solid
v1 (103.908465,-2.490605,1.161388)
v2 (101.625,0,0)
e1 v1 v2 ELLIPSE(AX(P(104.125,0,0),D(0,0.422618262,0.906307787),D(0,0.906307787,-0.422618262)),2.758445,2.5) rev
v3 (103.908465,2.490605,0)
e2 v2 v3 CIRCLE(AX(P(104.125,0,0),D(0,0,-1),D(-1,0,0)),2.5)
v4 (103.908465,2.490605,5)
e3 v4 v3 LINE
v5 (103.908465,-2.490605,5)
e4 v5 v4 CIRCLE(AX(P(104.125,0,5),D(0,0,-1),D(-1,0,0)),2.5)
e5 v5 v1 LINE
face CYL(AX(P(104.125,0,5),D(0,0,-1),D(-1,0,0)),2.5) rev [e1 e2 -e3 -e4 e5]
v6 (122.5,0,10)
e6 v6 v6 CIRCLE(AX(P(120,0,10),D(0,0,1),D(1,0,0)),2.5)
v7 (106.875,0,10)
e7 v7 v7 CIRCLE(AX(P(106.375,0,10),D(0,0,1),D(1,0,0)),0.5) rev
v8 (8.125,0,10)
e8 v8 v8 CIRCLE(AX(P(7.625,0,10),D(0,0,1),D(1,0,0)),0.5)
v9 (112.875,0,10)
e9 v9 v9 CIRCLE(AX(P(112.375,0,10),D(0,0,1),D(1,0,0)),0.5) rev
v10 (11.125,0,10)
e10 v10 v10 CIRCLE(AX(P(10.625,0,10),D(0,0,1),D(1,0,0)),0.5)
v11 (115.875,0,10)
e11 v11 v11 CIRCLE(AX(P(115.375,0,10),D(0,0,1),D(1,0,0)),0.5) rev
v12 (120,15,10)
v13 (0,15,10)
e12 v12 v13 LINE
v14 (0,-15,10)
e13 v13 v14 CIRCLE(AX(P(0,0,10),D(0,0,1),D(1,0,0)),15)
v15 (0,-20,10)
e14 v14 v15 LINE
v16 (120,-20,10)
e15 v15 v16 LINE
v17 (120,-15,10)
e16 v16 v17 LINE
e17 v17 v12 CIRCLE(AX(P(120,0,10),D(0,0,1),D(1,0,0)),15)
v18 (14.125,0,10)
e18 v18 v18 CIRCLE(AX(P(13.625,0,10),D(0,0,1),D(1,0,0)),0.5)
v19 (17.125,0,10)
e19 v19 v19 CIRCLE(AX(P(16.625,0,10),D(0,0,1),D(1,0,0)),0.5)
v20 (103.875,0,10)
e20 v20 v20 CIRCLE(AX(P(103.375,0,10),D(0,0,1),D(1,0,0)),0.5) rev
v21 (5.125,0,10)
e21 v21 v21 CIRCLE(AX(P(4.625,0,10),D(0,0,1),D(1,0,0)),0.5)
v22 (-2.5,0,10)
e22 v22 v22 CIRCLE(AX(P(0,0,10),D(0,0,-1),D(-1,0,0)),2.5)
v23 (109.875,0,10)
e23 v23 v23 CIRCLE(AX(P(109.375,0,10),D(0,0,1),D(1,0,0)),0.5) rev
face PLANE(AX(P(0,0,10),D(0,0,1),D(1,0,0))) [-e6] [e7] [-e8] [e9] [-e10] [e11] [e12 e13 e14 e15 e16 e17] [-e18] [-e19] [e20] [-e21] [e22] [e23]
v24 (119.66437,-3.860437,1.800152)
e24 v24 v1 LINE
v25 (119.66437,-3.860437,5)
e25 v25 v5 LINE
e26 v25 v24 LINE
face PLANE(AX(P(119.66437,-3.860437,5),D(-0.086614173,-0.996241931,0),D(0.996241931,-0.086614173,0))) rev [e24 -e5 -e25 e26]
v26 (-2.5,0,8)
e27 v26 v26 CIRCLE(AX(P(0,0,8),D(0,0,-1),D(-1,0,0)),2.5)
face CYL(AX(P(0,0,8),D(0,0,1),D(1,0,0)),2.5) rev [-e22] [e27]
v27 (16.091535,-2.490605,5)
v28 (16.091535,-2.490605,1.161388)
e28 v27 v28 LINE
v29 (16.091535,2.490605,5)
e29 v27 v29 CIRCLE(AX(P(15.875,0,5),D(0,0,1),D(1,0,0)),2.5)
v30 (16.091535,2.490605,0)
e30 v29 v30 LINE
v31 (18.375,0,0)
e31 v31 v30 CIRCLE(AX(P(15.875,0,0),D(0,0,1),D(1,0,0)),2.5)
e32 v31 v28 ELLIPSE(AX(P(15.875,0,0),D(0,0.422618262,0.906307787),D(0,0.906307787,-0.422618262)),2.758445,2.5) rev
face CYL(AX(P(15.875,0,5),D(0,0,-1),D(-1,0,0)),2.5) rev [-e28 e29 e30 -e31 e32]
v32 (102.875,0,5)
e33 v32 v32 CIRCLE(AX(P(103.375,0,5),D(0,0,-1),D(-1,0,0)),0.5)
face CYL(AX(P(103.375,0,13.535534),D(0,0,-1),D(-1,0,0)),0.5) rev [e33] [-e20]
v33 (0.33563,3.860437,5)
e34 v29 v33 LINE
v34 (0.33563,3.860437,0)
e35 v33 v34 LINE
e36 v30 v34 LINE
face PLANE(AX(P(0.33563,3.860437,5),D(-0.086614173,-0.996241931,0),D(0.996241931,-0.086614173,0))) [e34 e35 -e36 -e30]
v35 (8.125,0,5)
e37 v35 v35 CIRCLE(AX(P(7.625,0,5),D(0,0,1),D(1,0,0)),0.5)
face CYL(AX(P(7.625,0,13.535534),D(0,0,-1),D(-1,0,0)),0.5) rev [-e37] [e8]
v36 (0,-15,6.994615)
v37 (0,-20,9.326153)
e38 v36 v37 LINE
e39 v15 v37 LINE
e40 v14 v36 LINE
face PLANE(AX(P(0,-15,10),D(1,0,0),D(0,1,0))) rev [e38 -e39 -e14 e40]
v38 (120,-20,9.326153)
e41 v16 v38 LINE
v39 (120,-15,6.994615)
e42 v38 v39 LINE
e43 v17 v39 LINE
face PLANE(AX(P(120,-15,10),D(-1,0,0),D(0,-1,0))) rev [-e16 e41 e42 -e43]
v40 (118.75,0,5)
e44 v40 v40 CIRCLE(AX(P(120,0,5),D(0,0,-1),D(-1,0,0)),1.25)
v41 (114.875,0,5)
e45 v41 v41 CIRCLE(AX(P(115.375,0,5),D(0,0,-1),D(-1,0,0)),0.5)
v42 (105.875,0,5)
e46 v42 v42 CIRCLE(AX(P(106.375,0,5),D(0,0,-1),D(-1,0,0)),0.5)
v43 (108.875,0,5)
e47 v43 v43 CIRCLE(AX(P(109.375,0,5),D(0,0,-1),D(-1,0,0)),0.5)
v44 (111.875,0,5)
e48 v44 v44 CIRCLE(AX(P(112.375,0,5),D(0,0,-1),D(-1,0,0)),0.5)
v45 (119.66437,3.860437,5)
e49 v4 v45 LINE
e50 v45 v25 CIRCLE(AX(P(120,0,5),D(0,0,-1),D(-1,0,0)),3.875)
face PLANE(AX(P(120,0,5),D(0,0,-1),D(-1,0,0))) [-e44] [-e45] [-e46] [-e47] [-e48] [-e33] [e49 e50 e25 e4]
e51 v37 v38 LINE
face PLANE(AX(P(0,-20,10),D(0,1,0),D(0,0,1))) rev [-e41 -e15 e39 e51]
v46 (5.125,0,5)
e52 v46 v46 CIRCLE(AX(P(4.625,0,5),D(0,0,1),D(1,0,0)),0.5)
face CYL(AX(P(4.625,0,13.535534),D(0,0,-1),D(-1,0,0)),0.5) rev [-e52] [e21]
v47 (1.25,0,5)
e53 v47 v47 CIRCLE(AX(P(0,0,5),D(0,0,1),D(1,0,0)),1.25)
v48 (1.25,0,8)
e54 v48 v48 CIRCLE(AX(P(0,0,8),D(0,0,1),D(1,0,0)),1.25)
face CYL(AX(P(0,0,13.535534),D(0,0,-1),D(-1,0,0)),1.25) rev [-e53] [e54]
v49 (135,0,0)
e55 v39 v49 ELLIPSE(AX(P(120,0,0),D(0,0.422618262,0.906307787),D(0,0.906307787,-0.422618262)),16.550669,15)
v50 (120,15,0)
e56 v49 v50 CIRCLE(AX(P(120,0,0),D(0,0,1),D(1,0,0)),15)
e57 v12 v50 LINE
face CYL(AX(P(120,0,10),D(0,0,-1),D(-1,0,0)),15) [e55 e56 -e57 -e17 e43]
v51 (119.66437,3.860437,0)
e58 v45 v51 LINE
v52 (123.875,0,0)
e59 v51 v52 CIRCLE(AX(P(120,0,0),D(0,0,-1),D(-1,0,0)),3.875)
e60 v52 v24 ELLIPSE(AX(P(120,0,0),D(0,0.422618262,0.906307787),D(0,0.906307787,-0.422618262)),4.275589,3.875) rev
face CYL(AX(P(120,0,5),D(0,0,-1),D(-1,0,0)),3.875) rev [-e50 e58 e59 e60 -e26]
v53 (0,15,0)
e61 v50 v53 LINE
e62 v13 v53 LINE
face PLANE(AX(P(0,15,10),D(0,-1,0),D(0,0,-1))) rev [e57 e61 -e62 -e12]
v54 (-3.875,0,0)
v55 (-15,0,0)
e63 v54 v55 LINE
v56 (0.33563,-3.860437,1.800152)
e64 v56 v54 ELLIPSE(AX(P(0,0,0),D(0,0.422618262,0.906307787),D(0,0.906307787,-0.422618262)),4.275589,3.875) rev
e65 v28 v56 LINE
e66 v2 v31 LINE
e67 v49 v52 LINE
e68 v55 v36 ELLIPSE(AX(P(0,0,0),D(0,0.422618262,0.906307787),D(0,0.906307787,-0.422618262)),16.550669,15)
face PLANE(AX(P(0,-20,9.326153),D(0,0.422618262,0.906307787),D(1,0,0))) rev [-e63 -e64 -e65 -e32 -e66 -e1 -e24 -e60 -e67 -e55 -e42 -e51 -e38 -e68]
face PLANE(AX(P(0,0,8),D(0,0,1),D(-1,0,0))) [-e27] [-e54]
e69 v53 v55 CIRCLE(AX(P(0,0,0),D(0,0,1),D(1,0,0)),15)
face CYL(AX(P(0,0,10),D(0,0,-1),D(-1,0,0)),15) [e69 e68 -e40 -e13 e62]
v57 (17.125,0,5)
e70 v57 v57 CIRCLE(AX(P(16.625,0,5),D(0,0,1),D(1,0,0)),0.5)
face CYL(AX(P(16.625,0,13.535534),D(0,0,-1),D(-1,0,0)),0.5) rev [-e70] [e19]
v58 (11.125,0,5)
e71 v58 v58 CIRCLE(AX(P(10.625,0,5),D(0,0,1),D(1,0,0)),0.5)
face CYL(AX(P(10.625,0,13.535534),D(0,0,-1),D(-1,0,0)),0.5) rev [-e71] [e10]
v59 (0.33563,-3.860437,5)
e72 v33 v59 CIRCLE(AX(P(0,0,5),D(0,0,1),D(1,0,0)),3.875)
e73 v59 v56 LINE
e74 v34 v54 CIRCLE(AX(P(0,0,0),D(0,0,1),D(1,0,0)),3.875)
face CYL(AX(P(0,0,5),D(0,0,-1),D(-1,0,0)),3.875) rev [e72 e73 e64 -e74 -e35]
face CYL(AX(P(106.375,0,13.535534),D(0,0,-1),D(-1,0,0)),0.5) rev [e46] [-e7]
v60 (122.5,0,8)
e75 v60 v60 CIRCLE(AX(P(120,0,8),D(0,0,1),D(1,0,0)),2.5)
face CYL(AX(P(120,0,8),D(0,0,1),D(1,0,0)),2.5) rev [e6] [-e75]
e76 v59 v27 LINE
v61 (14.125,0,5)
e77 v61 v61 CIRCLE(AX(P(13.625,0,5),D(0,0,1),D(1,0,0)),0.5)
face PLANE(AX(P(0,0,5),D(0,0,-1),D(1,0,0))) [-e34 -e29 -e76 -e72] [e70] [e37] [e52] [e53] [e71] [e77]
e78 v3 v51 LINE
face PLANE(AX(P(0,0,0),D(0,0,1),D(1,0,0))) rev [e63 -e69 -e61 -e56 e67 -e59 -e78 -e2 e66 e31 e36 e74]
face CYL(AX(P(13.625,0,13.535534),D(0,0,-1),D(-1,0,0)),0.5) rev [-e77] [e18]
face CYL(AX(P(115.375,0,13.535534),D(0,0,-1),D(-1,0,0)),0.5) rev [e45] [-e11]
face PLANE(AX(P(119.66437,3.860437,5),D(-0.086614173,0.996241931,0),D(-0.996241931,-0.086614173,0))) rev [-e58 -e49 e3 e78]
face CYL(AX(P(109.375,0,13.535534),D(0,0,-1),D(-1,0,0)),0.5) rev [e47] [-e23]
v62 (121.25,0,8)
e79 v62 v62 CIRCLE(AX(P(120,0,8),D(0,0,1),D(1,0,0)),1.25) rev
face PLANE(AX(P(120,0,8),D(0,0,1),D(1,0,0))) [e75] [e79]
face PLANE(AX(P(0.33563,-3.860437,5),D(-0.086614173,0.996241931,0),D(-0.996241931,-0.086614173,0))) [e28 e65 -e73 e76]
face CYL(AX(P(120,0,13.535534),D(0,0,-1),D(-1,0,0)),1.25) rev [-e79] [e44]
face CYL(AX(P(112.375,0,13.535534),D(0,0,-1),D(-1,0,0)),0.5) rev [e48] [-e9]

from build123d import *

# Parameters (mm, degrees)
BOSS_EXTRUDE1_DEPTH = 10
CUT_EXTRUDE1_DEPTH  = 5
SKETCH3_R           = 0.5
SKETCH3_R_2         = 1.25
CUT_EXTRUDE2_DEPTH  = 5
SKETCH5_R           = 2.5
CUT_EXTRUDE3_DEPTH  = 2
CHAMFER1_SIZE       = 20
CHAMFER1_SIZE_2     = 9.326153163


with BuildPart() as part:
    # Sketch1 → Boss-Extrude1 (new body)
    with BuildSketch(Plane.XY):
        with BuildLine():
            Line((0, 15), (120, 15))
            ThreePointArc((120, 15), (135, 0), (120, -15))
            Line((120, -15), (120, -20))
            Line((120, -20), (0, -20))
            Line((0, -20), (0, -15))
            ThreePointArc((0, -15), (-15, 0), (0, 15))
        make_face()
    extrude(amount=BOSS_EXTRUDE1_DEPTH)

    # Sketch2 → Cut-Extrude1 (cut)
    with BuildSketch(Plane(origin=(0, 0, 0), x_dir=(-1, 0, 0), z_dir=(0, 0, -1))):
        with BuildLine():
            Line((-119.664370079, 3.860437482), (-103.908464567, 2.490604827))
            ThreePointArc((-103.908464567, 2.490604827), (-101.625, 0), (-103.908464567, -2.490604827))
            Line((-103.908464567, -2.490604827), (-119.664370079, -3.860437482))
            ThreePointArc((-119.664370079, -3.860437482), (-123.875, 0), (-119.664370079, 3.860437482))
        make_face()
    cut_extrude1 = extrude(amount=-CUT_EXTRUDE1_DEPTH, mode=Mode.SUBTRACT)

    # Sketch3 → Cut-Extrude2 (cut)
    with BuildSketch(Plane(origin=(0, 0, 5), x_dir=(-1, 0, 0), z_dir=(0, 0, -1))):
        with Locations((-115.375, 0)):
            Circle(SKETCH3_R)
        with Locations((-112.375, 0)):
            Circle(SKETCH3_R)
        with Locations((-109.375, 0)):
            Circle(SKETCH3_R)
        with Locations((-106.375, 0)):
            Circle(SKETCH3_R)
        with Locations((-103.375, 0)):
            Circle(SKETCH3_R)
        with Locations((-120, 0)):
            Circle(SKETCH3_R_2)
    cut_extrude2 = extrude(amount=-CUT_EXTRUDE2_DEPTH, mode=Mode.SUBTRACT)

    # Sketch5 → Cut-Extrude3 (cut)
    with BuildSketch(Plane.XY.offset(10)):
        with Locations((120, 0)):
            Circle(SKETCH5_R)
    cut_extrude3 = extrude(amount=-CUT_EXTRUDE3_DEPTH, mode=Mode.SUBTRACT)

    # Mirror1: Cut-Extrude1, Cut-Extrude2, Cut-Extrude3 across plane
    add(cut_extrude1.mirror(Plane(origin=(60, 0, 0), x_dir=(0, 0, 1), z_dir=(1, 0, 0))), mode=Mode.SUBTRACT)
    add(cut_extrude2.mirror(Plane(origin=(60, 0, 0), x_dir=(0, 0, 1), z_dir=(1, 0, 0))), mode=Mode.SUBTRACT)
    add(cut_extrude3.mirror(Plane(origin=(60, 0, 0), x_dir=(0, 0, 1), z_dir=(1, 0, 0))), mode=Mode.SUBTRACT)

    # Chamfer1
    # the kernel refuses this chamfer: 20, 9.326153163 mm, written as the material it takes off along each edge
    with BuildSketch(Plane(origin=(171.819509428, -20, 0), x_dir=(0, 0.9998669641130704, -0.016311164131110348), z_dir=(-1, 0, 0))) as chamfer1_piece_1:
        Polygon((CHAMFER1_SIZE * 0.999866964113, -CHAMFER1_SIZE * 0.0163111641311), (-CHAMFER1_SIZE_2 * 0.0163111641313, -CHAMFER1_SIZE_2 * 0.999866964124), (0, 0), align=None)
    extrude(amount=223.639018857, mode=Mode.SUBTRACT)


solid = part.part
